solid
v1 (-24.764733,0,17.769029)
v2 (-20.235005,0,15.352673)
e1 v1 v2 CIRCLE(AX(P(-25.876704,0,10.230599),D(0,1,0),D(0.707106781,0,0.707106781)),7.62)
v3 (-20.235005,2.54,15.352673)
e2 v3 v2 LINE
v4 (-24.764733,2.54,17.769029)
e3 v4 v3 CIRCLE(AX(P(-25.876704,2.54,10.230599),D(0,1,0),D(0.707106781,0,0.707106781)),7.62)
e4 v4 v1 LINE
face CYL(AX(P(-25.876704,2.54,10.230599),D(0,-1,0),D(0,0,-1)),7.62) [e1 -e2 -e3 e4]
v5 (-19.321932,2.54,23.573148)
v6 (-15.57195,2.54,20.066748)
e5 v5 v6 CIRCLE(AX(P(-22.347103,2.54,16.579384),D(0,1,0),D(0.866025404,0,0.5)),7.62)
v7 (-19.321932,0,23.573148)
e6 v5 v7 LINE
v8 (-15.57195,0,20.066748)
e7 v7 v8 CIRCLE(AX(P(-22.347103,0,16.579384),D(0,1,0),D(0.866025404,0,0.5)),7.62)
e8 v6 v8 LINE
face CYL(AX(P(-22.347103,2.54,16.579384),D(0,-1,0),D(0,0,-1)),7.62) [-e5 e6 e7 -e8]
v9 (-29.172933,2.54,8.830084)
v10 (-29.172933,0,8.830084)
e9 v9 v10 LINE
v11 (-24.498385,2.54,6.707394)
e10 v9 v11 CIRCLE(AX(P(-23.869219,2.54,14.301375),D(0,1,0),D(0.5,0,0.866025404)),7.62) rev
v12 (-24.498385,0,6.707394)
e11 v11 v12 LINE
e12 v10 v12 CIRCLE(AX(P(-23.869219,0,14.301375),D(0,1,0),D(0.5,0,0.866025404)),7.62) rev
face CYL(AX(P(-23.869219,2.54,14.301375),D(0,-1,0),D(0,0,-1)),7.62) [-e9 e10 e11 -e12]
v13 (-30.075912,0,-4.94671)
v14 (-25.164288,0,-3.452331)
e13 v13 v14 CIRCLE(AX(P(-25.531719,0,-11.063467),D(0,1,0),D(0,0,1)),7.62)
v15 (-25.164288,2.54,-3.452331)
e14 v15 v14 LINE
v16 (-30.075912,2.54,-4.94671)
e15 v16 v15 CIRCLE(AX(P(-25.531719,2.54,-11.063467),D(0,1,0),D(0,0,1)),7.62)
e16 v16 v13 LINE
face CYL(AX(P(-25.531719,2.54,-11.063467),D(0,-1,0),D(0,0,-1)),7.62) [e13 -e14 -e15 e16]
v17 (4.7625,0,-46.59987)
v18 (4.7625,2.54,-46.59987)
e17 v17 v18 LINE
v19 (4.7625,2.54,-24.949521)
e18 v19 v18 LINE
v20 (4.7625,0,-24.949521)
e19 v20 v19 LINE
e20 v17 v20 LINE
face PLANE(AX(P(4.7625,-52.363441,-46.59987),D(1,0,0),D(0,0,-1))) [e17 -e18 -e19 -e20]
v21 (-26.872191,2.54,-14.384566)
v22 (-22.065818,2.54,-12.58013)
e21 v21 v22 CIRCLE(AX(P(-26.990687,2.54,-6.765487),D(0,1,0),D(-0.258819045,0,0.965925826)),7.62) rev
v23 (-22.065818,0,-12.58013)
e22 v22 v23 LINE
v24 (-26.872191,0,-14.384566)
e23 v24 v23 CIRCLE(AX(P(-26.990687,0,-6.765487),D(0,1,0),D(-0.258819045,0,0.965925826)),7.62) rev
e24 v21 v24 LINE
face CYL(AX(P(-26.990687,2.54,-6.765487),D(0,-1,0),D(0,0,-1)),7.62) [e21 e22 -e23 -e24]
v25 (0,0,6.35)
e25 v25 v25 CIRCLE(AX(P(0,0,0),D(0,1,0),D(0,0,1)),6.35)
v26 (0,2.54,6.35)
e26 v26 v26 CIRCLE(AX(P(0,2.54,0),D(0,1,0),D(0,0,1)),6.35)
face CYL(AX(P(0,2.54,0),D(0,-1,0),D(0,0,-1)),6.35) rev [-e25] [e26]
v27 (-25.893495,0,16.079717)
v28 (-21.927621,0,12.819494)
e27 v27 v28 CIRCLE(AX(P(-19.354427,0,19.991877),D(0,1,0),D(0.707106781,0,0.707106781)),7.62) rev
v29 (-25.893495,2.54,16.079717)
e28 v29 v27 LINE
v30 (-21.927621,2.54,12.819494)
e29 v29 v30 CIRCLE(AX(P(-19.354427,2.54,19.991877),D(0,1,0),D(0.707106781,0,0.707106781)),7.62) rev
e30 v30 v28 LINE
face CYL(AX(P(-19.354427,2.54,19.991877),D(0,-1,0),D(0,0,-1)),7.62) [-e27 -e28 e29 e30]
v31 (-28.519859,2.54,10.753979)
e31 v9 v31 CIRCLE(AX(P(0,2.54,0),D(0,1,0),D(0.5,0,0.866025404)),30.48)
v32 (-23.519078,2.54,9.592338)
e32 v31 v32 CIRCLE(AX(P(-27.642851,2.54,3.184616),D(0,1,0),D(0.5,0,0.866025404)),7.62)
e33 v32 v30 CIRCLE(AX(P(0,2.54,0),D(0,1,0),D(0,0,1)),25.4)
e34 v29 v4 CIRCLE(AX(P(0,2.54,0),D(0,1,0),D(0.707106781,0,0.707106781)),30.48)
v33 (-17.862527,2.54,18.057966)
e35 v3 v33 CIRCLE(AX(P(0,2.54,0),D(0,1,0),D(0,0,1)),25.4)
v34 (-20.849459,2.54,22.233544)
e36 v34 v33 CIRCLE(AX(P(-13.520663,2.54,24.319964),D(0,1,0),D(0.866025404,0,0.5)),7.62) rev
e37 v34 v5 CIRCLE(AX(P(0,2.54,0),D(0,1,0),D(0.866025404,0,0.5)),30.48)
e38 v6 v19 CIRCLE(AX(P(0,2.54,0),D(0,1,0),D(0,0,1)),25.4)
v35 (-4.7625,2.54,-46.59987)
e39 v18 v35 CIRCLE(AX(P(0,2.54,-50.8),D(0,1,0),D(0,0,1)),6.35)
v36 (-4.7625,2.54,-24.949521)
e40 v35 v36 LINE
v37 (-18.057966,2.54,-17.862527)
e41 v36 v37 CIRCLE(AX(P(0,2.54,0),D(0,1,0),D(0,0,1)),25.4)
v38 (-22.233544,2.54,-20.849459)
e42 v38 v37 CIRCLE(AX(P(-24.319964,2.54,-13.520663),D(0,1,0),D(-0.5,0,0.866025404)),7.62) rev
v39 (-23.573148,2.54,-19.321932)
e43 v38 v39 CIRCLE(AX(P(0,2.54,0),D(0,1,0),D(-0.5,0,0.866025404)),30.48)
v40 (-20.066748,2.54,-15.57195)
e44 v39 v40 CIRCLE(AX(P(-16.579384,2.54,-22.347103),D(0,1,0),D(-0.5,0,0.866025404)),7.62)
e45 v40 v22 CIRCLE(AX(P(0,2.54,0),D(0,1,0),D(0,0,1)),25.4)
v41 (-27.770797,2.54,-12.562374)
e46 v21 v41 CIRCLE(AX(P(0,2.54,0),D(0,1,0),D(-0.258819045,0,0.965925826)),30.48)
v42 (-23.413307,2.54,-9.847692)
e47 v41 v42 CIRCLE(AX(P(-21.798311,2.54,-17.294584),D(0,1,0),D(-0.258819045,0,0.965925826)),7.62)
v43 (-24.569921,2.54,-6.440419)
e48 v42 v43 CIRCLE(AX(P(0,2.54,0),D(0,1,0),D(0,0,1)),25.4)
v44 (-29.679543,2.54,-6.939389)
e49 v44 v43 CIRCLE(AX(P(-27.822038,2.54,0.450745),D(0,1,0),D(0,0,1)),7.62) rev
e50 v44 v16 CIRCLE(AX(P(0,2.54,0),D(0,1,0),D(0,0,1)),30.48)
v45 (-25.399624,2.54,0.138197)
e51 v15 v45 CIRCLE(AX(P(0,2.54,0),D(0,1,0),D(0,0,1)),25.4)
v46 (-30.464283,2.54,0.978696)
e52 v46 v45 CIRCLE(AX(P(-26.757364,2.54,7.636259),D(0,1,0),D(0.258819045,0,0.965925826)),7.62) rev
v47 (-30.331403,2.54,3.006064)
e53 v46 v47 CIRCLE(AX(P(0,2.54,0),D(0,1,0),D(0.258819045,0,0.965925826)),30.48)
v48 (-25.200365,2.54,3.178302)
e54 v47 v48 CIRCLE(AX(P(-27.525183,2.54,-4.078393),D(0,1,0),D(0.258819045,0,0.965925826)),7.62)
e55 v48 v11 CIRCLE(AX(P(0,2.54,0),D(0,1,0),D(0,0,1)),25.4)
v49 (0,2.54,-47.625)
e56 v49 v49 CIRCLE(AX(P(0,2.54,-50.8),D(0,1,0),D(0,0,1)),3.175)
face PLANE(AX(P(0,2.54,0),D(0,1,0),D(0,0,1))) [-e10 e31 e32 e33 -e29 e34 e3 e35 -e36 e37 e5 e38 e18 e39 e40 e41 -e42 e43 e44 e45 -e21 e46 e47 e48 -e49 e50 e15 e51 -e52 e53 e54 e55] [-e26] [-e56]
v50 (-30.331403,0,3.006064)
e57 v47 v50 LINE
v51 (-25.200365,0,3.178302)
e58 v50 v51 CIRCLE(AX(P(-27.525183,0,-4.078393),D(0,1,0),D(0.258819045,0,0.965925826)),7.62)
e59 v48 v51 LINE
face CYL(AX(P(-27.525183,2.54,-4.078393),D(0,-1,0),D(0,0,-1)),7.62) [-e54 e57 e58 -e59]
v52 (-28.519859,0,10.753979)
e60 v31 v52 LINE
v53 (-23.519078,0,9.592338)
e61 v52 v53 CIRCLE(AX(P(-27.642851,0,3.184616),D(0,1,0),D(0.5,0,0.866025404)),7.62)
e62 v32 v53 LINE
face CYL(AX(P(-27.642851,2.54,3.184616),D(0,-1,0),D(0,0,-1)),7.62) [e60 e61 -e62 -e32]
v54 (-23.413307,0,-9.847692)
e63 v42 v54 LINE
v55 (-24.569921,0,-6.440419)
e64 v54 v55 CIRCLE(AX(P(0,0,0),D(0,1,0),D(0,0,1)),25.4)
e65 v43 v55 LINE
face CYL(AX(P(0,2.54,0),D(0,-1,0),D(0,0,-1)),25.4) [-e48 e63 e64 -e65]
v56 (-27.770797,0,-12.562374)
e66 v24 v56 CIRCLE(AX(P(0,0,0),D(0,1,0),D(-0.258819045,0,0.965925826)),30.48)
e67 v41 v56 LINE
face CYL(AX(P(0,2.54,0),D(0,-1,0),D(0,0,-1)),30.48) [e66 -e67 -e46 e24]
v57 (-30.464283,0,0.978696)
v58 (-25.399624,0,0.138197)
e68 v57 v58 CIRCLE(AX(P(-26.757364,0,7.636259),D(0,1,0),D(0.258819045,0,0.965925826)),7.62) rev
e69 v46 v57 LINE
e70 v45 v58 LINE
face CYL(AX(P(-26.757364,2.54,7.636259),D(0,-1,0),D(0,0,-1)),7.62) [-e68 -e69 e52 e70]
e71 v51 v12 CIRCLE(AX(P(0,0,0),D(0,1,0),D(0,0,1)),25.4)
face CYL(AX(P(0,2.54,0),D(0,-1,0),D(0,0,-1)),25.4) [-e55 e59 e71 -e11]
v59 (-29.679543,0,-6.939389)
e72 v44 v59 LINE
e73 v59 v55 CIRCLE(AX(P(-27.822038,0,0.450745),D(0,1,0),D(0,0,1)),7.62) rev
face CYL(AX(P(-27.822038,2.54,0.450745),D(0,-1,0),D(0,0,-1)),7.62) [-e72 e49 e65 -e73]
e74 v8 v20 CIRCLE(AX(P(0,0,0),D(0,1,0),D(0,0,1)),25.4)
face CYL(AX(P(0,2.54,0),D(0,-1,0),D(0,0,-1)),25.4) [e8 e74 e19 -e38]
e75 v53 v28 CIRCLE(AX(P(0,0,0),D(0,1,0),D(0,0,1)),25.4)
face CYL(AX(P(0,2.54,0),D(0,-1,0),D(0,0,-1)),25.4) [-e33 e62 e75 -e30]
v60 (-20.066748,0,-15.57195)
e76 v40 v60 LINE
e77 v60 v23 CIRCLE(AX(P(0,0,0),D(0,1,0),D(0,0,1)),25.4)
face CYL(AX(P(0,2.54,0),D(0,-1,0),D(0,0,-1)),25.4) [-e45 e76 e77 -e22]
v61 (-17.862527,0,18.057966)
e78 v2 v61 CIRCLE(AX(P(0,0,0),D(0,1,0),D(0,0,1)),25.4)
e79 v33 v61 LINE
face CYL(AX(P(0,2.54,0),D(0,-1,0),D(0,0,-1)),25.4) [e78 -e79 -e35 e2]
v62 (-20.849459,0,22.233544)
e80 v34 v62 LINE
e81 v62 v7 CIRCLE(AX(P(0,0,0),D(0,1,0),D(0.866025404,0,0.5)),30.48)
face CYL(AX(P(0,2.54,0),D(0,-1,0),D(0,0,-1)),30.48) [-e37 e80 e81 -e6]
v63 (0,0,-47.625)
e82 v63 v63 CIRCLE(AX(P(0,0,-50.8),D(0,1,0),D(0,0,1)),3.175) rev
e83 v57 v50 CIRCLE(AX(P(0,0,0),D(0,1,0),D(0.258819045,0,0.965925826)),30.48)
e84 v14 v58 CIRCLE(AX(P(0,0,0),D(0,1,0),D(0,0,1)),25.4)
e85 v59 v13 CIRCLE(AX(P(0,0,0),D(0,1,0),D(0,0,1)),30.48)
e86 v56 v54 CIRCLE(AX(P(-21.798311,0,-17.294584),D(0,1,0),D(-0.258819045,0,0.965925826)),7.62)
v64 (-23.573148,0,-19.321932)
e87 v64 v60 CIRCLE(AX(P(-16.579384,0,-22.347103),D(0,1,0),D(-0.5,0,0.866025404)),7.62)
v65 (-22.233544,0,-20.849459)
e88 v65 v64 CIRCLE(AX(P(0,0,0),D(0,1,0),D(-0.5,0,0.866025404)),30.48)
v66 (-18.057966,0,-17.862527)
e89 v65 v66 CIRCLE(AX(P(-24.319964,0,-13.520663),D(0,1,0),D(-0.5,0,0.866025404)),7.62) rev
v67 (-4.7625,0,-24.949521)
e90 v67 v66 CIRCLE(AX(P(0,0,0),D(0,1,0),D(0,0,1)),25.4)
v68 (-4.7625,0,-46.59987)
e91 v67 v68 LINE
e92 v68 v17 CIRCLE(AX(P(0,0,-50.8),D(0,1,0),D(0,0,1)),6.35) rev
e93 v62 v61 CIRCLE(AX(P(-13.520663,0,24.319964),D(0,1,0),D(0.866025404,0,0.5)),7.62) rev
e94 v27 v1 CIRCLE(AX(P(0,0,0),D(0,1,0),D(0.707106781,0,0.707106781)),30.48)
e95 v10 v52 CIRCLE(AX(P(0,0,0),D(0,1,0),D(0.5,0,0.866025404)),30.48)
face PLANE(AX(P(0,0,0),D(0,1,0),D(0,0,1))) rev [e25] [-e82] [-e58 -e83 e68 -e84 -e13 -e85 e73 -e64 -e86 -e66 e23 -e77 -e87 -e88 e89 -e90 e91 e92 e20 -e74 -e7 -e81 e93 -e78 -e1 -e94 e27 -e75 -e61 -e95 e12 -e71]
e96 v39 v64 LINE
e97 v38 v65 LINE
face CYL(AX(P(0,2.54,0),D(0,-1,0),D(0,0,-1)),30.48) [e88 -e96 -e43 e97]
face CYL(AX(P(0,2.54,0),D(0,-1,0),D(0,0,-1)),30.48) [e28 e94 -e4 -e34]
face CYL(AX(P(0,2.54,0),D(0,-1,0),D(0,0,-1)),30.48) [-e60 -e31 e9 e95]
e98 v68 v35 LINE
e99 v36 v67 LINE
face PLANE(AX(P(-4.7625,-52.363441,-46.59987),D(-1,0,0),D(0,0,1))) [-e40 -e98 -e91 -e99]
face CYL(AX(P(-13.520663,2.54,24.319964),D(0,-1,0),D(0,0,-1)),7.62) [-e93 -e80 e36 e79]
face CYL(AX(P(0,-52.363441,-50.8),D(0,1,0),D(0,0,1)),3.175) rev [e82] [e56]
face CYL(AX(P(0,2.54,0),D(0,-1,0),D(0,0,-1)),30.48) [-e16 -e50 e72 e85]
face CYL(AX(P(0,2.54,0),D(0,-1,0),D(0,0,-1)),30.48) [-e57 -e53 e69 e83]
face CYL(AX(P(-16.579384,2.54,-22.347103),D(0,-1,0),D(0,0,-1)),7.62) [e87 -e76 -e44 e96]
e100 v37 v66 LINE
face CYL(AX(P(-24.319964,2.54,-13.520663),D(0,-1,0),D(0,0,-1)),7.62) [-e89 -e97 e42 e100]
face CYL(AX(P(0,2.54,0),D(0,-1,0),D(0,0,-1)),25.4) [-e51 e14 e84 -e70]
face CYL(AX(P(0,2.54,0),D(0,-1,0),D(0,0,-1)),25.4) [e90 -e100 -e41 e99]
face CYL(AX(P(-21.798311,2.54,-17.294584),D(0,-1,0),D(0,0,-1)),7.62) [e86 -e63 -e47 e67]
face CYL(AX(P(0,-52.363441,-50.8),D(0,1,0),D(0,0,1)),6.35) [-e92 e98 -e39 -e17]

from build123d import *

# Parameters (mm, degrees)
SKETCH1_R           = 25.4
SKETCH1_R_2         = 6.35
BOSS_EXTRUDE1_DEPTH = 2.54
BOSS_EXTRUDE3_DEPTH = 2.54
CIRPATTERN2_DEPTH   = 2.54
SKETCH4_R           = 3.175
BOSS_EXTRUDE4_DEPTH = 2.54


# Read off the part's stored shape, not the designer's step: CirPattern2
with BuildPart() as part:
    # Sketch1 → Boss-Extrude1 (new body)
    with BuildSketch(Plane(origin=(0, 0, 0), x_dir=(1, 0, 0), z_dir=(0, 1, 0))):
        with Locations(Location((0, 0, 0), (0, 0, 270))):
            Circle(SKETCH1_R)
        with Locations(Location((0, 0, 0), (0, 0, 270))):
            Circle(SKETCH1_R_2, mode=Mode.SUBTRACT)
    extrude(amount=BOSS_EXTRUDE1_DEPTH)

    # Sketch3 → Boss-Extrude3 (add)
    with BuildSketch(Plane(origin=(0, 0, 0), x_dir=(1, 0, 0), z_dir=(0, 1, 0))):
        with BuildLine():
            ThreePointArc((-24.569920792, 6.440418643), (-27.081444643, 7.133180463), (-29.679543147, 6.939388921))
            ThreePointArc((-29.679543147, 6.939388921), (-29.894335347, 5.946353015), (-30.075911618, 4.94671005))
            ThreePointArc((-30.075911618, 4.94671005), (-27.7497424, 3.773420758), (-25.164288447, 3.452330656))
            ThreePointArc((-25.164288447, 3.452330656), (-24.911946122, 4.955294179), (-24.569920792, 6.440418643))
        make_face()
    extrude(amount=BOSS_EXTRUDE3_DEPTH)

    # CirPattern2 outline → CirPattern2 (add)
    with BuildSketch(Plane(origin=(0, 0, 0), x_dir=(1, 0, 0), z_dir=(0, 1, 0))):
        with BuildLine():
            ThreePointArc((-23.413307188, 9.847692448), (-22.780567636, 11.234132732), (-22.06581804, 12.580130138))
            ThreePointArc((-22.06581804, 12.580130138), (-24.312463838, 13.899316875), (-26.872191224, 14.384565994))
            ThreePointArc((-26.872191224, 14.384565994), (-27.336681162, 13.480959278), (-27.77079701, 12.562373718))
            ThreePointArc((-27.77079701, 12.562373718), (-25.8275597, 10.827006393), (-23.413307188, 9.847692448))
        make_face()
        with BuildLine():
            ThreePointArc((-20.066747736, 15.571950275), (-19.096731111, 16.747383705), (-18.057966254, 17.862526553))
            ThreePointArc((-18.057966254, 17.862526553), (-19.886628801, 19.718237812), (-22.233543877, 20.849458666))
            ThreePointArc((-22.233543877, 20.849458666), (-22.916077332, 20.096860444), (-23.573148479, 19.321932378))
            ThreePointArc((-23.573148479, 19.321932378), (-22.145271488, 17.142749435), (-20.066747736, 15.571950275))
        make_face()
        with BuildLine():
            ThreePointArc((-15.571950272, -20.066747733), (-16.747383702, -19.096731108), (-17.86252655, -18.057966251))
            ThreePointArc((-17.86252655, -18.057966251), (-19.718237812, -19.886628801), (-20.849458666, -22.233543877))
            ThreePointArc((-20.849458666, -22.233543877), (-20.096860444, -22.916077332), (-19.321932378, -23.573148479))
            ThreePointArc((-19.321932378, -23.573148479), (-17.142749435, -22.145271488), (-15.571950272, -20.066747733))
        make_face()
        with BuildLine():
            ThreePointArc((-20.235005421, -15.352672585), (-21.119328151, -14.111483918), (-21.927621299, -12.819493908))
            ThreePointArc((-21.927621299, -12.819493908), (-24.193393428, -14.105552875), (-25.893495185, -16.079717258))
            ThreePointArc((-25.893495185, -16.079717258), (-25.343193783, -16.933780702), (-24.764733277, -17.769028835))
            ThreePointArc((-24.764733277, -17.769028835), (-22.290242434, -16.953819621), (-20.235005421, -15.352672585))
        make_face()
        with BuildLine():
            ThreePointArc((-23.51907839, -9.592338172), (-24.052025288, -8.164562418), (-24.498384895, -6.70739424))
            ThreePointArc((-24.498384895, -6.70739424), (-27.019809264, -7.363206831), (-29.172932798, -8.830084481))
            ThreePointArc((-29.172932798, -8.830084481), (-28.862430347, -9.797474903), (-28.519858529, -10.753979241))
            ThreePointArc((-28.519858529, -10.753979241), (-25.918692246, -10.606992964), (-23.51907839, -9.592338172))
        make_face()
        with BuildLine():
            ThreePointArc((-30.464283252, -0.978696039), (-30.41473998, -1.993487379), (-30.331402553, -3.006063733))
            ThreePointArc((-30.331402553, -3.006063733), (-27.780826014, -3.537317266), (-25.200365035, -3.178301765))
            ThreePointArc((-25.200365035, -3.178301765), (-25.34561665, -1.661239483), (-25.399624045, -0.138196738))
            ThreePointArc((-25.399624045, -0.138196738), (-28.00486975, -0.11907041), (-30.464283252, -0.978696039))
        make_face()
    extrude(amount=CIRPATTERN2_DEPTH)

    # Sketch4 → Boss-Extrude4 (add)
    with BuildSketch(Plane(origin=(0, 2.54, 0), x_dir=(1, 0, 0), z_dir=(0, 1, 0))):
        with BuildLine():
            Line((-4.7625, 6.35), (4.7625, 6.35))
            Line((4.7625, 6.35), (4.7625, 46.599869794))
            ThreePointArc((4.7625, 46.599869794), (0, 57.15), (-4.7625, 46.599869794))
            Line((-4.7625, 46.599869794), (-4.7625, 6.35))
        make_face()
        with Locations(Location((0, 50.8, 0), (0, 0, 270))):
            Circle(SKETCH4_R, mode=Mode.SUBTRACT)
    extrude(amount=-BOSS_EXTRUDE4_DEPTH)


solid = part.part
